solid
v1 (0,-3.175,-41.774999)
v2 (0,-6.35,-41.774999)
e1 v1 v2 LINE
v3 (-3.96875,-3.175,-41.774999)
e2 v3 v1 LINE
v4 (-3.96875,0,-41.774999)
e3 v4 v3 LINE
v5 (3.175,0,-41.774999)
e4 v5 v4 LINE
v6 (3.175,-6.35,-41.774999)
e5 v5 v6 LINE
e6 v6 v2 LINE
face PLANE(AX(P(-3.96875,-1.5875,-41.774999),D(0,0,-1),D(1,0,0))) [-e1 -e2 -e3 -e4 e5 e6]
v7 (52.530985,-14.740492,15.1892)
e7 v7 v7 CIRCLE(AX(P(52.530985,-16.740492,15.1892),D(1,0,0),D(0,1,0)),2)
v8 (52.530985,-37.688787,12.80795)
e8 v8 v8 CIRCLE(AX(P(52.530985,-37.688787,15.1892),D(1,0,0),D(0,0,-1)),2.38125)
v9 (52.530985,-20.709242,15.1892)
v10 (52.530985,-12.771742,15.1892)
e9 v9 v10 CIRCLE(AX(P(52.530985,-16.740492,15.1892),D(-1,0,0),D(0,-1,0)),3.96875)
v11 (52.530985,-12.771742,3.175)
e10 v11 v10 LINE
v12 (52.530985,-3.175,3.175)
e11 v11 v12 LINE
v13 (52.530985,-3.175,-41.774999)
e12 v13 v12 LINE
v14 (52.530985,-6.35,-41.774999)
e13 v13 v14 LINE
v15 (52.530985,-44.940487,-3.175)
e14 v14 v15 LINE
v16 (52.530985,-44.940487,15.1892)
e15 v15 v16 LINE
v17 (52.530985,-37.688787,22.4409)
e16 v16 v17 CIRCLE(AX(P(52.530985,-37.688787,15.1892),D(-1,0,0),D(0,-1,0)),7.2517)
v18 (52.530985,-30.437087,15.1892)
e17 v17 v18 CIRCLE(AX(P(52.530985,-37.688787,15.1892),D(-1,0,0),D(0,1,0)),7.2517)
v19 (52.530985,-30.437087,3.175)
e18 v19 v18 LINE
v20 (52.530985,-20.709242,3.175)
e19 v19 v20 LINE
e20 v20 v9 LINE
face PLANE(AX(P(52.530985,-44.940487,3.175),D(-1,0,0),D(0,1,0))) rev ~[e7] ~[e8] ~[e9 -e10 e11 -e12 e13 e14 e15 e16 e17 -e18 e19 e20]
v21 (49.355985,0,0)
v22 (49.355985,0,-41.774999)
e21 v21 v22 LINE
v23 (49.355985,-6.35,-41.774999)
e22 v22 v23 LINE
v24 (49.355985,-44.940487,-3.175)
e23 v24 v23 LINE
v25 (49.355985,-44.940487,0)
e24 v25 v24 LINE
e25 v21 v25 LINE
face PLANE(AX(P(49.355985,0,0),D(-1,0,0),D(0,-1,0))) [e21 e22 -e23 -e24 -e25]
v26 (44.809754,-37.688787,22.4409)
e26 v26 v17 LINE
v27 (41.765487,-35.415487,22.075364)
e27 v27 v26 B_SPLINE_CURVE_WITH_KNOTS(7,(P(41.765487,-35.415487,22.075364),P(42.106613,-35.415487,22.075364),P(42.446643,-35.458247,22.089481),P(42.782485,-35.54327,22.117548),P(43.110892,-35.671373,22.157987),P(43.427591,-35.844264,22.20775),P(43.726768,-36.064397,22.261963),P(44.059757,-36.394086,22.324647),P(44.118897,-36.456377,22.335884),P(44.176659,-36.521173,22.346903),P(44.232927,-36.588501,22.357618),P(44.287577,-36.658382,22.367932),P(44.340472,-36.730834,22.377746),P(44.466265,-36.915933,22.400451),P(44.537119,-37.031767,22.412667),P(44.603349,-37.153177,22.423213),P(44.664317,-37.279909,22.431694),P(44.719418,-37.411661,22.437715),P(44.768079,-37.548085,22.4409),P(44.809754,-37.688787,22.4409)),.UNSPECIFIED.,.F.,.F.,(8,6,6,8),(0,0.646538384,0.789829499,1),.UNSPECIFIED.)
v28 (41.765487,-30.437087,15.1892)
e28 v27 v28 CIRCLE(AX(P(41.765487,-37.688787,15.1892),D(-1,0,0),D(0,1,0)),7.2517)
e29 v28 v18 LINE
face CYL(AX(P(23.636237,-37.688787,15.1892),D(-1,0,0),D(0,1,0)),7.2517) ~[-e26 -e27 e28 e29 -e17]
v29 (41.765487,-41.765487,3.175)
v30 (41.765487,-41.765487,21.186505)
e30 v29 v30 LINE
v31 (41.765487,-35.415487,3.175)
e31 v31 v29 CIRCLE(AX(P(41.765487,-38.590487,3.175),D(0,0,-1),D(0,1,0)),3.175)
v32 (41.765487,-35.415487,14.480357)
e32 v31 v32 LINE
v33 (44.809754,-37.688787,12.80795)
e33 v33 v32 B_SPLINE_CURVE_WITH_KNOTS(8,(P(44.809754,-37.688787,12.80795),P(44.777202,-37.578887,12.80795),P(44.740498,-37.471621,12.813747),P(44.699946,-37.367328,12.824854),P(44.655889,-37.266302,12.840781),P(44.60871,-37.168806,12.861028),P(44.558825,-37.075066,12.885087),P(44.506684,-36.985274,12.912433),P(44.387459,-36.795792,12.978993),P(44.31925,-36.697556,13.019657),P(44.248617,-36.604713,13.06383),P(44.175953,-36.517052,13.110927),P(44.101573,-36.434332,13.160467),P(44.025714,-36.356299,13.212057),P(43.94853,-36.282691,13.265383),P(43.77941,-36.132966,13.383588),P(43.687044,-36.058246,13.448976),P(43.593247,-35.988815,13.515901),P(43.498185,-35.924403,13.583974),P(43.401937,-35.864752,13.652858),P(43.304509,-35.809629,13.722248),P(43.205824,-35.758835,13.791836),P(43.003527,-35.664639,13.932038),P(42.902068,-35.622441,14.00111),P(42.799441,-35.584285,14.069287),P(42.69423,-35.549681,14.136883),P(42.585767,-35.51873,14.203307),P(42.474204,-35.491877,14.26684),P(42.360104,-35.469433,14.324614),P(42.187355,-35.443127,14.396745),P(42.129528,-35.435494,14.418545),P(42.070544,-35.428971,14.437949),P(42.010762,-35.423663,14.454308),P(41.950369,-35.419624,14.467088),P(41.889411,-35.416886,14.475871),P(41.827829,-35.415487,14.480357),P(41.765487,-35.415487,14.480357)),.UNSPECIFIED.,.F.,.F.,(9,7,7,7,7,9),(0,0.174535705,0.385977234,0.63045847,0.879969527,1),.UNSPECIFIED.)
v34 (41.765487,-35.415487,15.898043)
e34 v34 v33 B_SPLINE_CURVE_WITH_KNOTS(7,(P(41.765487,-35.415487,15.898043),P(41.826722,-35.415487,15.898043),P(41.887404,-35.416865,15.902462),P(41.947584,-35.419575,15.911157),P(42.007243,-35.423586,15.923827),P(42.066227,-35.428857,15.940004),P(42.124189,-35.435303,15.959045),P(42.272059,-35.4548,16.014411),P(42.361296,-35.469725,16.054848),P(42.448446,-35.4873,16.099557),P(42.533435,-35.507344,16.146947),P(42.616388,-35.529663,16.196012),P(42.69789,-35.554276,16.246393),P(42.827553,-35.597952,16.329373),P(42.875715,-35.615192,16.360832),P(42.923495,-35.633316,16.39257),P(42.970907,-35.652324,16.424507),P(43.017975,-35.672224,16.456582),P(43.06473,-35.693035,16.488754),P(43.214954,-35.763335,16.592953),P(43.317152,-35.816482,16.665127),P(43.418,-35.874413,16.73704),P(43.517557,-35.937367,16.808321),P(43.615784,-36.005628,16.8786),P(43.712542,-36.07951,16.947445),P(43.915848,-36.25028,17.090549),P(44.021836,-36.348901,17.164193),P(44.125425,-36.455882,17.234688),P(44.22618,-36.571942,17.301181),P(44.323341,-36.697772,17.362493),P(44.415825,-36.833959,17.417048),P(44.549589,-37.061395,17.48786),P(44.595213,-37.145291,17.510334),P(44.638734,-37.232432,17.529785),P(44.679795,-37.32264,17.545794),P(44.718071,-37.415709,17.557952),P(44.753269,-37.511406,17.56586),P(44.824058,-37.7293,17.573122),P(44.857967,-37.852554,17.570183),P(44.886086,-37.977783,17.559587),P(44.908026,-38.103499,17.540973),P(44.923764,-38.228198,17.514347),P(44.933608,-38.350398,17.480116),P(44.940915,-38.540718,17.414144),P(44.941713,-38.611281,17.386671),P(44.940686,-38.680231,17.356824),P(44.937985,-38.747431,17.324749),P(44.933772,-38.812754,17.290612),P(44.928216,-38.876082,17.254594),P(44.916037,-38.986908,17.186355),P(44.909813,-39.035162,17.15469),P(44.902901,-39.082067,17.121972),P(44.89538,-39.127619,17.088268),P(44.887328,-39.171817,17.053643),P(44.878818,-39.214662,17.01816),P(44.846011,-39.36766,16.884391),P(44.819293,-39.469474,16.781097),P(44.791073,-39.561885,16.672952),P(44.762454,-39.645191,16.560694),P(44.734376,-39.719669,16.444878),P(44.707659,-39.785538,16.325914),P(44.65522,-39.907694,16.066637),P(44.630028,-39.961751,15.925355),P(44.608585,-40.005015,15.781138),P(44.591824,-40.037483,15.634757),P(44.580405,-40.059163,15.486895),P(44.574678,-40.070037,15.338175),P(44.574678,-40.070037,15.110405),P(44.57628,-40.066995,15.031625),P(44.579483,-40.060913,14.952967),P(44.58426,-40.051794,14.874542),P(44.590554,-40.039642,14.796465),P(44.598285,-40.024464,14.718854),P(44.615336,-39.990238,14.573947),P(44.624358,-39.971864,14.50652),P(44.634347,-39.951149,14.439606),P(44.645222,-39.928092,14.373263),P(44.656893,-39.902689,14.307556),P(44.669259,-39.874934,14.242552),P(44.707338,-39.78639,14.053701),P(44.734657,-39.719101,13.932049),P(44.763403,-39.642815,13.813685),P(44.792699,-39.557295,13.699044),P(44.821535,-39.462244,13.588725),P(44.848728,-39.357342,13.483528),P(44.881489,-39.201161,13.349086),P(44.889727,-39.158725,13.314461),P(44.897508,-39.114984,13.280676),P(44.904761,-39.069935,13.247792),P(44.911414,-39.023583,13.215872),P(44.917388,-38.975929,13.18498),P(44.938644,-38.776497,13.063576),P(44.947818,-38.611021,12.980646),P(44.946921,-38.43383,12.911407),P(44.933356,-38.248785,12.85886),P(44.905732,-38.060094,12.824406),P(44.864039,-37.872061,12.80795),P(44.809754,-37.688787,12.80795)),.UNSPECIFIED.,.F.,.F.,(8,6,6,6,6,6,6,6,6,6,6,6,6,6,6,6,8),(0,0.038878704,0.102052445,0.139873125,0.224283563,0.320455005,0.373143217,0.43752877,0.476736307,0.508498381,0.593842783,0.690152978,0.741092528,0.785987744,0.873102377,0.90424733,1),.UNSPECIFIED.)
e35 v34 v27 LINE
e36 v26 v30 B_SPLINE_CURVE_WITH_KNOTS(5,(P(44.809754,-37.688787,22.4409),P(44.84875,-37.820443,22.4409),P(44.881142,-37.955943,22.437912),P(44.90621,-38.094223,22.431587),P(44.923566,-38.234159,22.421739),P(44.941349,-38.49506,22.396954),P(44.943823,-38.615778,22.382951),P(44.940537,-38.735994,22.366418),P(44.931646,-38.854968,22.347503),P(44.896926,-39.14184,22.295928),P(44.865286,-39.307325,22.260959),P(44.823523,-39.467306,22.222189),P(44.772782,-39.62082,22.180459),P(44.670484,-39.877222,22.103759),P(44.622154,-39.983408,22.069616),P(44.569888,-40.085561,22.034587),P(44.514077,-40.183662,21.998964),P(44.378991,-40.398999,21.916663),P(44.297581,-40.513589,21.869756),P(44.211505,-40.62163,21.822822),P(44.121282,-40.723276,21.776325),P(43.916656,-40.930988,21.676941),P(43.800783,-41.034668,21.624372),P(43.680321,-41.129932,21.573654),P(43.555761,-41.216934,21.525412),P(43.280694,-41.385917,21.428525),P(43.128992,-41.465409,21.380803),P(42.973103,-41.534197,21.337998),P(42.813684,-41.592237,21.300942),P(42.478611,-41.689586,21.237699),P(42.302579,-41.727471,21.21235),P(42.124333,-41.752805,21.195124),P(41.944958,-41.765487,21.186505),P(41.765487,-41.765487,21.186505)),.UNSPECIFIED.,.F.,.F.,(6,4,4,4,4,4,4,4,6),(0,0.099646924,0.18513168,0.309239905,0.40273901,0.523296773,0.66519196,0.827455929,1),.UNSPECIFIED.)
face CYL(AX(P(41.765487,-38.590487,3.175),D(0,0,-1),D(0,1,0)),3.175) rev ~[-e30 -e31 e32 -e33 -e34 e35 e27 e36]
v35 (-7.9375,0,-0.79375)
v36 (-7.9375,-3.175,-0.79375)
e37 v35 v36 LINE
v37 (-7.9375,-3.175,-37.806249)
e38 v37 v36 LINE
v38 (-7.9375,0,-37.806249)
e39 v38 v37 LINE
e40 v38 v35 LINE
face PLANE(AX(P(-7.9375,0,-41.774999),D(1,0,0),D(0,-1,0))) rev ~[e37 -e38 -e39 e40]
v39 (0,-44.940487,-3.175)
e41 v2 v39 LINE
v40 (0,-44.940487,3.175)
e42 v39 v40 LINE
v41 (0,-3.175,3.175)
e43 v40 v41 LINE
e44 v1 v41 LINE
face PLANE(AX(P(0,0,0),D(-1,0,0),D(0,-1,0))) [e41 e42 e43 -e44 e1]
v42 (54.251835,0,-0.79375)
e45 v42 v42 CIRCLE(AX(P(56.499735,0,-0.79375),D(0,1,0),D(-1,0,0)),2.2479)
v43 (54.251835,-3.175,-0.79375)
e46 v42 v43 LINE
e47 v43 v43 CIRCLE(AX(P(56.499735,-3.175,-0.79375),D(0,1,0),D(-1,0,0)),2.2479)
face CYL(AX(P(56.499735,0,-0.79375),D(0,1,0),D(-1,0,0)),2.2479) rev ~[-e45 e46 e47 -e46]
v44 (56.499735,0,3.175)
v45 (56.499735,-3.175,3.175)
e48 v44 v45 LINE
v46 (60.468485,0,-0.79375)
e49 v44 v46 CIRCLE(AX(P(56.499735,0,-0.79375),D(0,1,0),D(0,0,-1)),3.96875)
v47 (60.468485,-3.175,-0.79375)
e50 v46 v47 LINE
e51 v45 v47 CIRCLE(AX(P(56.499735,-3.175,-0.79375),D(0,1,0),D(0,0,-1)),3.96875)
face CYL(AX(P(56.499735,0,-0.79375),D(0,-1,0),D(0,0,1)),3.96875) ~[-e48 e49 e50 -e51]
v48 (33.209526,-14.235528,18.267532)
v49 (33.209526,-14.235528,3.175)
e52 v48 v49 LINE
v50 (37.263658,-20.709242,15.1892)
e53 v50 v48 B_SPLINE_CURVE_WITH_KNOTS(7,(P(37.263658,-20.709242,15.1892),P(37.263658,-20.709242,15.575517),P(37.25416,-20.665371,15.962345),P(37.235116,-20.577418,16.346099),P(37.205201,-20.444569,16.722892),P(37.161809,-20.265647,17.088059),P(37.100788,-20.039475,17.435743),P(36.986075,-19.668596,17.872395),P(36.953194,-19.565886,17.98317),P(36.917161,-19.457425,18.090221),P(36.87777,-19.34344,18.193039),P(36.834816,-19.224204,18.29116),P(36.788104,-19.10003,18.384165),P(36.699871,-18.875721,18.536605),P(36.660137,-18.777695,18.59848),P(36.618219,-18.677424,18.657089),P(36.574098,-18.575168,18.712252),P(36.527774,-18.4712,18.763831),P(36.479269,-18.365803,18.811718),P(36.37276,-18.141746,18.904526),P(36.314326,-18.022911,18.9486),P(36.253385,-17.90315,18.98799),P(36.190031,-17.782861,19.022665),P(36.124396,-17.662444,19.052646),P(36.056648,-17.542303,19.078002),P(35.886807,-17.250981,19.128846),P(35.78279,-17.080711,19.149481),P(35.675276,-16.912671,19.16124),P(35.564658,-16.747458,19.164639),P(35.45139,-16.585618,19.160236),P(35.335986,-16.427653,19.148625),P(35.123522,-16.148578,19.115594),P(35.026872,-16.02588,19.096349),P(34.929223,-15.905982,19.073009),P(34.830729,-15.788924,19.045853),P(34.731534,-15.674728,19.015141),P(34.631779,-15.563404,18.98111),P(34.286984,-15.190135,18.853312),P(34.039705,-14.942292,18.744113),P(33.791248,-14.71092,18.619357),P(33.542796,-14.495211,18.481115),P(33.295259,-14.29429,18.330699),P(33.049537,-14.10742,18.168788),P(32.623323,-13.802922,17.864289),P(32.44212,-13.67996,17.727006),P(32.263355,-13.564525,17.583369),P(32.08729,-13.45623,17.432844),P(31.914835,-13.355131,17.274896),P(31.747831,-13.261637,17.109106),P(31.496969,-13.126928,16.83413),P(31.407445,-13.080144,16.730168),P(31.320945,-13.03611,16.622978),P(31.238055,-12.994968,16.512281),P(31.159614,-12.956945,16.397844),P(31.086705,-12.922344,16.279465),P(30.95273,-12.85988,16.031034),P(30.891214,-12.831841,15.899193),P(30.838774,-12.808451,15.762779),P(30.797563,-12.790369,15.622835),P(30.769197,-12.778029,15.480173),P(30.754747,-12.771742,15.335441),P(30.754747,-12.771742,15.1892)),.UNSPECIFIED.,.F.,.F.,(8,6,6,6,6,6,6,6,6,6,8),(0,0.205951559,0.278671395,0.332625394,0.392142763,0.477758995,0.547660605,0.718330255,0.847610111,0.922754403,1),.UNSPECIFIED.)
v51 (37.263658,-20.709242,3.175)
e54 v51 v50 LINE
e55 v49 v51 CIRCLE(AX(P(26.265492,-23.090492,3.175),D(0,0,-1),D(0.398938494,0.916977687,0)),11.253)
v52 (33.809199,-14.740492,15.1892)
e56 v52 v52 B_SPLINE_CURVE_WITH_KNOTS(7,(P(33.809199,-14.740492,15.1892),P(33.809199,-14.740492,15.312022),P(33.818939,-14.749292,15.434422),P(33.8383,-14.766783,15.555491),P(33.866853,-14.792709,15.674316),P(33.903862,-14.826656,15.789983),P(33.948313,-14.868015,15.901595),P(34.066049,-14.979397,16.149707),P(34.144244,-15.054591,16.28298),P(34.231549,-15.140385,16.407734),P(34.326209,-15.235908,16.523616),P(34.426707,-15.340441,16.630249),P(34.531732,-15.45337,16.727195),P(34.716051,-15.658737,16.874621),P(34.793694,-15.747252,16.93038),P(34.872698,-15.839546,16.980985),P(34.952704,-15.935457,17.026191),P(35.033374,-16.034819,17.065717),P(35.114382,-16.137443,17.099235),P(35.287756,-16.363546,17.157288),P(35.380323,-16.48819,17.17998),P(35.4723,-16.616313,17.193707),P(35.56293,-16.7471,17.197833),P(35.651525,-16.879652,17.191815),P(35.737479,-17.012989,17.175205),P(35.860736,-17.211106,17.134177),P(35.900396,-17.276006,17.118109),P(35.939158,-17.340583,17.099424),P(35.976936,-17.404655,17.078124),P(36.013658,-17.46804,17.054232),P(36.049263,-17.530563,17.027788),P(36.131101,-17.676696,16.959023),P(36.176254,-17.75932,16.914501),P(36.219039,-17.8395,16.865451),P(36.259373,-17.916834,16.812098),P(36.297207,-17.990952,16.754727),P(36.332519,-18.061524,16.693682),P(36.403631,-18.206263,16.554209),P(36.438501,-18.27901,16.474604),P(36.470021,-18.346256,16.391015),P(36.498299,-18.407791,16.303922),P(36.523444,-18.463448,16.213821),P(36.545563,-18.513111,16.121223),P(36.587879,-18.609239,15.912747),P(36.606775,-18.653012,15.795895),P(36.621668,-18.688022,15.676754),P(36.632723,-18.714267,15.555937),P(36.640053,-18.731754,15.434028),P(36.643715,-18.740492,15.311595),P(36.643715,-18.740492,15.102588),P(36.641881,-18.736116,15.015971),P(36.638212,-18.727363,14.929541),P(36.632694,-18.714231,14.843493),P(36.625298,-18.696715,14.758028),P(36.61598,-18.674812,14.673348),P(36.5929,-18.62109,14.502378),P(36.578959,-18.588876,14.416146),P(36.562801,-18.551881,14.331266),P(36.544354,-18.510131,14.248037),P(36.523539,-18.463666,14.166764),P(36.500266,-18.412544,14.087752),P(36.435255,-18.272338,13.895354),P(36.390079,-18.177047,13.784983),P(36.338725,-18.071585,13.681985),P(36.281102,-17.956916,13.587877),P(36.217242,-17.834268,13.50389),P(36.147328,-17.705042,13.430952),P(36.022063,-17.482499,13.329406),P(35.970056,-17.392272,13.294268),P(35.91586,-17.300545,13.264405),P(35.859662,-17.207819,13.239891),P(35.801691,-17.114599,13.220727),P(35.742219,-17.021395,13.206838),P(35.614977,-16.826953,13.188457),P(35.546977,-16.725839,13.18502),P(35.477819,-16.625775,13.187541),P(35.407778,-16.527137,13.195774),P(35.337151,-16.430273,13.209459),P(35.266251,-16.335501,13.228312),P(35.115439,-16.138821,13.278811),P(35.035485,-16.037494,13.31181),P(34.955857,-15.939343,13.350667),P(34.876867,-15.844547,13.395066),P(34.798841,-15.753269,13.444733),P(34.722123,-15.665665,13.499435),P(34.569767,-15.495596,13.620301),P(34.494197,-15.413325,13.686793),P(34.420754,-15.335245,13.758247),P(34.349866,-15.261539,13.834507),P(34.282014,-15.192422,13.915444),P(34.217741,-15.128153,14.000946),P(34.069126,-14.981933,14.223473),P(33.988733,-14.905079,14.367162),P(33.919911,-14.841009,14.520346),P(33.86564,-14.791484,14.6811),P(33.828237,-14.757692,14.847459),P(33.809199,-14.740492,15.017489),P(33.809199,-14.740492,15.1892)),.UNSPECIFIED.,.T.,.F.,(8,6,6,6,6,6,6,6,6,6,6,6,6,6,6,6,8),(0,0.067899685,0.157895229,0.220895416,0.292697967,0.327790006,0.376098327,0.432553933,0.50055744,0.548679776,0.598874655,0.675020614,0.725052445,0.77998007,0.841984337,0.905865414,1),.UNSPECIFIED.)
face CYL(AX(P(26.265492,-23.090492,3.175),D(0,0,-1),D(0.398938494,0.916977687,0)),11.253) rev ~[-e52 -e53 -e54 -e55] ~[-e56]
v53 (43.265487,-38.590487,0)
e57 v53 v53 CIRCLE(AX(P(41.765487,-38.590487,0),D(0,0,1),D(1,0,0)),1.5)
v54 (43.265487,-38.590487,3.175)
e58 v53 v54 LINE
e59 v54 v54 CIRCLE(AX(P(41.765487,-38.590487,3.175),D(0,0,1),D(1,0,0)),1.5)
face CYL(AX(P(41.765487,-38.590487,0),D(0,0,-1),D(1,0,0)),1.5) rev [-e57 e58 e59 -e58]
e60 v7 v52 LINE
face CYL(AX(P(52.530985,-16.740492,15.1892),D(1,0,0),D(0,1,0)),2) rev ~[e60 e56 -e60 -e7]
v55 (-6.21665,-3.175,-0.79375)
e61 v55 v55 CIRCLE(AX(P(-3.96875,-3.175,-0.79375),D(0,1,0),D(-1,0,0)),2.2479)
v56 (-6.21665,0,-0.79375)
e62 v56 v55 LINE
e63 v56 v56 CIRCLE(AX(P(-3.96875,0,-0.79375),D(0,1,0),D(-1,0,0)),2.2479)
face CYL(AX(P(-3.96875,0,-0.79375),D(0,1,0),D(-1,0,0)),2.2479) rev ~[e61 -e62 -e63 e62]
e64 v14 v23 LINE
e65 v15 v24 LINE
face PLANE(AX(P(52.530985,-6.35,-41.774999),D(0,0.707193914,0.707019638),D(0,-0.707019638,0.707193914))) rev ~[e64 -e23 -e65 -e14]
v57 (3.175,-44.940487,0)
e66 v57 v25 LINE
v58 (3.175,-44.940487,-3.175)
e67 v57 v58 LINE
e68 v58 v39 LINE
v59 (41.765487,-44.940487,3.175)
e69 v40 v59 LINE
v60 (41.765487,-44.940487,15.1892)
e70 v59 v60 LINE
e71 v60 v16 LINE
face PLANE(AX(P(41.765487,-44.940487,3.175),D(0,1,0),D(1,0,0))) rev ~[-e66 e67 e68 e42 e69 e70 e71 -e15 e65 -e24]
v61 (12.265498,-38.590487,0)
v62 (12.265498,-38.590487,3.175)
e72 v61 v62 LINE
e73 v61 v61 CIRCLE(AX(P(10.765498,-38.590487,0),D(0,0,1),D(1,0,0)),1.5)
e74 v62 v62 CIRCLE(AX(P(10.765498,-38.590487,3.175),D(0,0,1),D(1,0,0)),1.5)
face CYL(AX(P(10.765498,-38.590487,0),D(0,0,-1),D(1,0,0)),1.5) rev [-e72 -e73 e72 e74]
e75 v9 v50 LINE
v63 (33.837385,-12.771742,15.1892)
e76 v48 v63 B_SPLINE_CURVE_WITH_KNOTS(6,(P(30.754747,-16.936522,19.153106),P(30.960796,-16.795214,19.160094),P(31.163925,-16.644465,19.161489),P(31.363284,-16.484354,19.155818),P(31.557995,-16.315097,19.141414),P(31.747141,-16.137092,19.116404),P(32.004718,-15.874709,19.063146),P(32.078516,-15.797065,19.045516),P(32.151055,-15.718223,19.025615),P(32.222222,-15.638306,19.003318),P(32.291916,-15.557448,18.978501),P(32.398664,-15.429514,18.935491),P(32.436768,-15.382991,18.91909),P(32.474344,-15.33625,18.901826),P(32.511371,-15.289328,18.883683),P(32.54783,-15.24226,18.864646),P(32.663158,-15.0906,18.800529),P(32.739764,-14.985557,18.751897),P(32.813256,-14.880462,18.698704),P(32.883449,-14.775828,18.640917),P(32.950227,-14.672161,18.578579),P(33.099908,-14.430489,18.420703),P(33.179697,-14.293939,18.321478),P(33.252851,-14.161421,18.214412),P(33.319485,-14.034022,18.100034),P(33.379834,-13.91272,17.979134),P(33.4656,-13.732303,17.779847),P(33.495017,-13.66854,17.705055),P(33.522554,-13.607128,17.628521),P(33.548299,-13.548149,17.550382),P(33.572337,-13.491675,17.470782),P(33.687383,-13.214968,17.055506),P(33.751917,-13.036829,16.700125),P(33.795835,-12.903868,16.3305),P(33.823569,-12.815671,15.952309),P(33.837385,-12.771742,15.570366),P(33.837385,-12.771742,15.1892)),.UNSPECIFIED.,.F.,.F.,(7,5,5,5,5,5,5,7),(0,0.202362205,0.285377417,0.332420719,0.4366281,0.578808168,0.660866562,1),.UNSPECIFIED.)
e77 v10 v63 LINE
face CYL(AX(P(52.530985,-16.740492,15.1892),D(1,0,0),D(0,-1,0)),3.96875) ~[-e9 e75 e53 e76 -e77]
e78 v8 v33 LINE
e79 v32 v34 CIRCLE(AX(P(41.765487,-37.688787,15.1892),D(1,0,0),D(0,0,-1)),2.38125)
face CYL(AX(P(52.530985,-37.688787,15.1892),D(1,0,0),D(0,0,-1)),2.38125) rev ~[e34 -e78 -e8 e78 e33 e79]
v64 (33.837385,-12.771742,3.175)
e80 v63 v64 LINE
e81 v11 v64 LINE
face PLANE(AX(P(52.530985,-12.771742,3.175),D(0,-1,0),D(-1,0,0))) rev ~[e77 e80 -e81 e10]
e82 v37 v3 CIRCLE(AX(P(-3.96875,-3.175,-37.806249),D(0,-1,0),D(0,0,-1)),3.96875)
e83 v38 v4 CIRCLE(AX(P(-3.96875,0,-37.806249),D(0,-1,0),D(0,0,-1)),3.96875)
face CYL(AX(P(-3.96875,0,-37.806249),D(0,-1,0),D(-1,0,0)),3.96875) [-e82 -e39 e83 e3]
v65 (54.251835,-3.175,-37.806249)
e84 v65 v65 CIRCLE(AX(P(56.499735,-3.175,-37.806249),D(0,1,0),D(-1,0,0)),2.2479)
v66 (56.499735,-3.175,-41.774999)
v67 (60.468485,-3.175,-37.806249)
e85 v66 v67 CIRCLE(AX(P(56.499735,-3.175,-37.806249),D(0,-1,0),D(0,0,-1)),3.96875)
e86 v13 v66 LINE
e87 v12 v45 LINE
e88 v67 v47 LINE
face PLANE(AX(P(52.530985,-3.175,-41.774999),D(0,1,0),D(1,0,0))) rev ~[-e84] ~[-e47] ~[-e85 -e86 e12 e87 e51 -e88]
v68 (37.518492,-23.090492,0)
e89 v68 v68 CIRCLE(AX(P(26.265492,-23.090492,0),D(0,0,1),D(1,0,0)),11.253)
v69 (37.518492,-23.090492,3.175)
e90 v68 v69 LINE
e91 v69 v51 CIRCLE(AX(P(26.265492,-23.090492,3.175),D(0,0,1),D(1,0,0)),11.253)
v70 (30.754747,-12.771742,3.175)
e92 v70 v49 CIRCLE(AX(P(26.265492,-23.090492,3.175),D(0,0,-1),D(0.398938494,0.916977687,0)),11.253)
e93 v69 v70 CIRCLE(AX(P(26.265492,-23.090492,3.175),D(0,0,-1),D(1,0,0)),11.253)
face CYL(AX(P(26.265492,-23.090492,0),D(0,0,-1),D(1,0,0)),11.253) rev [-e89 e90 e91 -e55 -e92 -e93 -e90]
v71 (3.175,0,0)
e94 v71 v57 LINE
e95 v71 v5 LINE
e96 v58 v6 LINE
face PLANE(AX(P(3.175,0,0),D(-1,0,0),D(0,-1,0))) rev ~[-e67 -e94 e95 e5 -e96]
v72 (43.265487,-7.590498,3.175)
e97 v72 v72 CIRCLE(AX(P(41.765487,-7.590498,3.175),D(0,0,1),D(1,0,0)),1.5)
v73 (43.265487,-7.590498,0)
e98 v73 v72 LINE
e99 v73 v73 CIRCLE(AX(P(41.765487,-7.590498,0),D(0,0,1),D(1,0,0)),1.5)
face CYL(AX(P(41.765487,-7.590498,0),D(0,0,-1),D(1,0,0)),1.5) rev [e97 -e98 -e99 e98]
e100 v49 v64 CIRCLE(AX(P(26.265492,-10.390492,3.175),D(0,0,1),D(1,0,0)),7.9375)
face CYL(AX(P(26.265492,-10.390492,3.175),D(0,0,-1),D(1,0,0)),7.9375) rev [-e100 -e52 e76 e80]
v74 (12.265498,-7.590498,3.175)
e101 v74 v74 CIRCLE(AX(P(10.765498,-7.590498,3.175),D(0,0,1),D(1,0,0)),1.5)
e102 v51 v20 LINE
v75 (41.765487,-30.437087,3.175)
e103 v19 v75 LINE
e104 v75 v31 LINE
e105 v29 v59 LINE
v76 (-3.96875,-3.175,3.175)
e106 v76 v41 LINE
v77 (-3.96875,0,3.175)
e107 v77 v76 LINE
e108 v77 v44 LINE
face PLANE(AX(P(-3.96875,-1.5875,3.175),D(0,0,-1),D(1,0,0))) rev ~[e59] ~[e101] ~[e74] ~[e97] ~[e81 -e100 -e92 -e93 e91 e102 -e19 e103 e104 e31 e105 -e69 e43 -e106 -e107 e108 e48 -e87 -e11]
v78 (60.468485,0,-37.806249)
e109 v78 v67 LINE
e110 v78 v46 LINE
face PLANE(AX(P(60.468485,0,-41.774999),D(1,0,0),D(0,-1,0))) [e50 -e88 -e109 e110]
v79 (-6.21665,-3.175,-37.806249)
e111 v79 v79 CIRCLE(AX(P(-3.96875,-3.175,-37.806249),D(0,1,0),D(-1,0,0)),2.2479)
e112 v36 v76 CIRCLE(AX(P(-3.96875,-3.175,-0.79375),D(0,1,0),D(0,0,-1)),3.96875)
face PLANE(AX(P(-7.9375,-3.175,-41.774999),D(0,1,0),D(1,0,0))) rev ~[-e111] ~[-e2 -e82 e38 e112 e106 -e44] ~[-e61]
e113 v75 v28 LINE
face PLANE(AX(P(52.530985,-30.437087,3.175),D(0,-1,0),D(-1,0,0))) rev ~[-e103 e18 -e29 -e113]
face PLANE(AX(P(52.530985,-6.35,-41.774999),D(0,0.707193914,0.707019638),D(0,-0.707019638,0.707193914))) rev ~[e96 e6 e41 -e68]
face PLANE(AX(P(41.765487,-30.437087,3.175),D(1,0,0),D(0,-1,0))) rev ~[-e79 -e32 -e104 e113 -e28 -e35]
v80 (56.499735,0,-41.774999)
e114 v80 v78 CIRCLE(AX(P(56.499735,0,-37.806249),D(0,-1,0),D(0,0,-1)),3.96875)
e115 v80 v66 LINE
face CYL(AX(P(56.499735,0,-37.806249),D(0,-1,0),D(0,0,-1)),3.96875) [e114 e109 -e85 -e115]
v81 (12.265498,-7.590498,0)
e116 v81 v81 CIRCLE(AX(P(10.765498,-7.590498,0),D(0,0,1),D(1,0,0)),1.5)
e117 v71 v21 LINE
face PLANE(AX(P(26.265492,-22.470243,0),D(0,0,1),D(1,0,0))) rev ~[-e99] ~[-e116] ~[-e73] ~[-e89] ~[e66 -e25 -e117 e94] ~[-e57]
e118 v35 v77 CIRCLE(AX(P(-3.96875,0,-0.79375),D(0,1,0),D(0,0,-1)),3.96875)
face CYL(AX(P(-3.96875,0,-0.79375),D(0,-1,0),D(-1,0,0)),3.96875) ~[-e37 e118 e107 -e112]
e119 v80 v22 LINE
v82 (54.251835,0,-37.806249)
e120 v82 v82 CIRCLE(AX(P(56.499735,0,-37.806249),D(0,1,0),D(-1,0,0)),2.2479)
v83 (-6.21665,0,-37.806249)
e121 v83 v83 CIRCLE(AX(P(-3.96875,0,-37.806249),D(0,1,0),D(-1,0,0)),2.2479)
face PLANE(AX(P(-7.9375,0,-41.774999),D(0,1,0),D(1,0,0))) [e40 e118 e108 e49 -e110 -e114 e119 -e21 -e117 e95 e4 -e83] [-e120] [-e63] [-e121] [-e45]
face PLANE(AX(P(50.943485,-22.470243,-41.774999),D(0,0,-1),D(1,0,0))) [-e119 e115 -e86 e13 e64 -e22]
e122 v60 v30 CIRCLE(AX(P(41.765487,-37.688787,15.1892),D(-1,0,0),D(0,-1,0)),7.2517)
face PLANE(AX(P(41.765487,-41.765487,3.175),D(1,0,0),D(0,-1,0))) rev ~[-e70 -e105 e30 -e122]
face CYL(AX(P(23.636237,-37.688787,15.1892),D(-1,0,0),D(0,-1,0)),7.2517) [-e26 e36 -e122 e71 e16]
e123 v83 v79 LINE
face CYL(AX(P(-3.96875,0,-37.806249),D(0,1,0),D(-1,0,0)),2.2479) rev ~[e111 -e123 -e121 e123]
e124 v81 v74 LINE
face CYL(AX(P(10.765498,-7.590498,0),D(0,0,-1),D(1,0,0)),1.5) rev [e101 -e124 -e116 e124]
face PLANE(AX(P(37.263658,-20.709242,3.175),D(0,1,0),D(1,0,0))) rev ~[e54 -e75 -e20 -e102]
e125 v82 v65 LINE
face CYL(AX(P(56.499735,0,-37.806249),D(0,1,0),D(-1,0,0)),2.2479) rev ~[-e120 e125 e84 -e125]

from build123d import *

# Parameters (mm, degrees)
F0_W         = 52.5309846
F0_H         = 44.9404867
F0_R         = 1.5
F0_R_2       = 11.2530001
F1_DEPTH     = 3.175
F2_W         = 3.175
F2_H         = 44.9404867
F3_DEPTH     = 41.774999
F4_W         = 7.9375
F4_H         = 3.175
F5_DEPTH     = 44.949999
F6_R         = 3.96875
F7_R         = 2.2479
F8_DEPTH     = 3.175
F10_DEPTH    = 52.5309846
F12_DEPTH    = 19.2659
F14_DEPTH    = 10.7654979
F15_T1_DEPTH = 47.0239979
F16_R        = 2
F17_DEPTH    = 134
F18_R        = 7.9375
F19_DEPTH    = 25.4


# Not quite as in the source:
# - a fillet or chamfer that OpenCascade refuses, or shapes differently, is made with other operations: its cross-section is extruded or revolved along the edge and cut away or added
# - an extrude ends at something that could not be found from the text; its depth is read off the source's solid
# - a feature names something its author has since deleted; it is built from what else it names


with BuildPart() as f1:
    # F0 (on Top) → F1 (new body)
    with BuildSketch(Plane.XY):
        with Locations((26.2654923, -22.47024335)):
            Rectangle(F0_W, F0_H)
        with Locations((10.7654979, -38.5904867)):
            Circle(F0_R, mode=Mode.SUBTRACT)
        with Locations((26.2654923, -23.0904923)):
            Circle(F0_R_2, mode=Mode.SUBTRACT)
        with Locations((41.7654867, -38.5904867)):
            Circle(F0_R, mode=Mode.SUBTRACT)
        with Locations((10.7654979, -7.5904979)):
            Circle(F0_R, mode=Mode.SUBTRACT)
        with Locations((41.7654867, -7.5904979)):
            Circle(F0_R, mode=Mode.SUBTRACT)
    extrude(amount=F1_DEPTH)

    # F2 (on face) → F3 (join)
    with BuildSketch(Plane(origin=(0, 0, 0), x_dir=(1, 0, 0), z_dir=(0, 0, -1))):
        with Locations((1.5875, 22.47024335)):
            Rectangle(F2_W, F2_H)
        with Locations((50.9434846, 22.47024335)):
            Rectangle(F2_W, F2_H)
    extrude(amount=F3_DEPTH)

    # F4 (on face) → F5 (join, through all)
    with BuildSketch(Plane(origin=(0, 0, -41.774999), x_dir=(1, 0, 0), z_dir=(0, 0, -1))):
        with Locations((-3.96875, 1.5875)):
            Rectangle(F4_W, F4_H)
        with Locations((56.4997346, 1.5875)):
            Rectangle(F4_W, F4_H)
    extrude(amount=-F5_DEPTH)

    # F6
    f6_edges = [f1.edges().sort_by_distance(p)[0] for p in [
        (60.468485, -1.5875, -41.774999),
        (60.468485, -1.5875, 3.175),
        (-7.9375, -1.5875, 3.175),
        (-7.9375, -1.5875, -41.774999),
    ]]
    fillet(f6_edges, radius=F6_R)

    # F7 (on face) → F8 (cut, through all)
    with BuildSketch(Plane(origin=(0, 0, 0), x_dir=(-1, 0, 0), z_dir=(0, 1, 0))):
        with Locations((3.96875, -37.806249)):
            Circle(F7_R)
        with Locations((3.96875, -0.79375)):
            Circle(F7_R)
        with Locations((-56.4997346, -0.79375)):
            Circle(F7_R)
        with Locations((-56.4997346, -37.806249)):
            Circle(F7_R)
    extrude(amount=-F8_DEPTH, mode=Mode.SUBTRACT)

    # F9 (on face) → F10 (cut, through all)
    with BuildSketch(Plane.YZ.offset(52.5309846)):
        Polygon((-44.9404867, -3.175), (-44.9404867, -41.774999), (-6.35, -41.774999), align=None)
    extrude(amount=-F10_DEPTH, mode=Mode.SUBTRACT)

    # F11 (on face) → F12 (join)
    with BuildSketch(Plane.XY.offset(3.175)):
        with BuildLine():
            Line((41.7654867, -44.9404867), (52.5309846, -44.9404867))
            Line((52.5309846, -44.9404867), (52.5309846, -30.4370867))
            Line((52.5309846, -30.4370867), (41.7654867, -30.4370867))
            Line((41.7654867, -30.4370867), (41.7654867, -35.4154867))
            ThreePointArc((41.7654867, -35.4154867), (44.9404867, -38.5904867), (41.7654867, -41.7654867))
            Line((41.7654867, -41.7654867), (41.7654867, -44.9404867))
        make_face()
        with BuildLine():
            Line((52.5309846, -20.7092423), (52.5309846, -12.7717423))
            Line((52.5309846, -12.7717423), (30.7547472146, -12.7717423))
            ThreePointArc((30.7547472146, -12.7717423), (34.966988133, -15.9550889113), (37.2636584966, -20.7092423))
            Line((37.2636584966, -20.7092423), (52.5309846, -20.7092423))
        make_face()
    extrude(amount=F12_DEPTH)

    # F13 (on face) → F14 (cut, through all)
    with BuildSketch(Plane.YZ.offset(52.5309846)):
        with BuildLine():
            Line((-40.0700367, 15.1892), (-37.6887867, 15.1892))
            Line((-37.6887867, 15.1892), (-37.6887867, 12.80795))
            ThreePointArc((-37.6887867, 12.80795), (-36.0049886773, 13.5054019773), (-35.3075367, 15.1892))
            ThreePointArc((-35.3075367, 15.1892), (-37.6887867, 17.57045), (-40.0700367, 15.1892))
        make_face()
        with BuildLine():
            Line((-37.6887867, 12.80795), (-37.6887867, 15.1892))
            Line((-37.6887867, 15.1892), (-40.0700367, 15.1892))
            ThreePointArc((-40.0700367, 15.1892), (-39.3725847227, 13.5054019773), (-37.6887867, 12.80795))
        make_face()
    extrude(amount=-F14_DEPTH, mode=Mode.SUBTRACT)

    # F15: fillet of radius 7.2517 on 2 edges, made by hand

    # F15_s2 → F15_t1 (cut)
    with BuildSketch(Plane.YZ.offset(23.6362367)):
        with BuildLine():
            ThreePointArc((-44.9404867, 15.1892), (-42.8165129451, 20.3169262451), (-37.6887867, 22.4409))
            Line((-37.6887867, 22.4409), (-44.9404867, 22.4409))
            Line((-44.9404867, 22.4409), (-44.9404867, 15.1892))
        make_face()
        with BuildLine():
            ThreePointArc((-30.4370867, 15.1892), (-32.5610604549, 20.3169262451), (-37.6887867, 22.4409))
            Line((-37.6887867, 22.4409), (-30.4370867, 22.4409))
            Line((-30.4370867, 22.4409), (-30.4370867, 15.1892))
        make_face()
    extrude(amount=F15_T1_DEPTH, mode=Mode.SUBTRACT)

    # F16 (on face) → F17 (cut, through all)
    with BuildSketch(Plane.YZ.offset(52.5309846)):
        with BuildLine():
            Line((-12.7717423, 22.4409), (-20.7092423, 22.4409))
            Line((-20.7092423, 22.4409), (-20.7092423, 15.1892))
            ThreePointArc((-20.7092423, 15.1892), (-16.7404923, 19.15795), (-12.7717423, 15.1892))
            Line((-12.7717423, 15.1892), (-12.7717423, 22.4409))
        make_face()
        with Locations((-16.7404923, 15.1892)):
            Circle(F16_R)
    extrude(amount=-F17_DEPTH, mode=Mode.SUBTRACT)

    # F18 (on face) → F19 (cut)
    with BuildSketch(Plane.XY.offset(3.175)):
        with Locations((26.2654923, -10.3904923)):
            Circle(F18_R)
    extrude(amount=F19_DEPTH, mode=Mode.SUBTRACT)


solid = f1.part
